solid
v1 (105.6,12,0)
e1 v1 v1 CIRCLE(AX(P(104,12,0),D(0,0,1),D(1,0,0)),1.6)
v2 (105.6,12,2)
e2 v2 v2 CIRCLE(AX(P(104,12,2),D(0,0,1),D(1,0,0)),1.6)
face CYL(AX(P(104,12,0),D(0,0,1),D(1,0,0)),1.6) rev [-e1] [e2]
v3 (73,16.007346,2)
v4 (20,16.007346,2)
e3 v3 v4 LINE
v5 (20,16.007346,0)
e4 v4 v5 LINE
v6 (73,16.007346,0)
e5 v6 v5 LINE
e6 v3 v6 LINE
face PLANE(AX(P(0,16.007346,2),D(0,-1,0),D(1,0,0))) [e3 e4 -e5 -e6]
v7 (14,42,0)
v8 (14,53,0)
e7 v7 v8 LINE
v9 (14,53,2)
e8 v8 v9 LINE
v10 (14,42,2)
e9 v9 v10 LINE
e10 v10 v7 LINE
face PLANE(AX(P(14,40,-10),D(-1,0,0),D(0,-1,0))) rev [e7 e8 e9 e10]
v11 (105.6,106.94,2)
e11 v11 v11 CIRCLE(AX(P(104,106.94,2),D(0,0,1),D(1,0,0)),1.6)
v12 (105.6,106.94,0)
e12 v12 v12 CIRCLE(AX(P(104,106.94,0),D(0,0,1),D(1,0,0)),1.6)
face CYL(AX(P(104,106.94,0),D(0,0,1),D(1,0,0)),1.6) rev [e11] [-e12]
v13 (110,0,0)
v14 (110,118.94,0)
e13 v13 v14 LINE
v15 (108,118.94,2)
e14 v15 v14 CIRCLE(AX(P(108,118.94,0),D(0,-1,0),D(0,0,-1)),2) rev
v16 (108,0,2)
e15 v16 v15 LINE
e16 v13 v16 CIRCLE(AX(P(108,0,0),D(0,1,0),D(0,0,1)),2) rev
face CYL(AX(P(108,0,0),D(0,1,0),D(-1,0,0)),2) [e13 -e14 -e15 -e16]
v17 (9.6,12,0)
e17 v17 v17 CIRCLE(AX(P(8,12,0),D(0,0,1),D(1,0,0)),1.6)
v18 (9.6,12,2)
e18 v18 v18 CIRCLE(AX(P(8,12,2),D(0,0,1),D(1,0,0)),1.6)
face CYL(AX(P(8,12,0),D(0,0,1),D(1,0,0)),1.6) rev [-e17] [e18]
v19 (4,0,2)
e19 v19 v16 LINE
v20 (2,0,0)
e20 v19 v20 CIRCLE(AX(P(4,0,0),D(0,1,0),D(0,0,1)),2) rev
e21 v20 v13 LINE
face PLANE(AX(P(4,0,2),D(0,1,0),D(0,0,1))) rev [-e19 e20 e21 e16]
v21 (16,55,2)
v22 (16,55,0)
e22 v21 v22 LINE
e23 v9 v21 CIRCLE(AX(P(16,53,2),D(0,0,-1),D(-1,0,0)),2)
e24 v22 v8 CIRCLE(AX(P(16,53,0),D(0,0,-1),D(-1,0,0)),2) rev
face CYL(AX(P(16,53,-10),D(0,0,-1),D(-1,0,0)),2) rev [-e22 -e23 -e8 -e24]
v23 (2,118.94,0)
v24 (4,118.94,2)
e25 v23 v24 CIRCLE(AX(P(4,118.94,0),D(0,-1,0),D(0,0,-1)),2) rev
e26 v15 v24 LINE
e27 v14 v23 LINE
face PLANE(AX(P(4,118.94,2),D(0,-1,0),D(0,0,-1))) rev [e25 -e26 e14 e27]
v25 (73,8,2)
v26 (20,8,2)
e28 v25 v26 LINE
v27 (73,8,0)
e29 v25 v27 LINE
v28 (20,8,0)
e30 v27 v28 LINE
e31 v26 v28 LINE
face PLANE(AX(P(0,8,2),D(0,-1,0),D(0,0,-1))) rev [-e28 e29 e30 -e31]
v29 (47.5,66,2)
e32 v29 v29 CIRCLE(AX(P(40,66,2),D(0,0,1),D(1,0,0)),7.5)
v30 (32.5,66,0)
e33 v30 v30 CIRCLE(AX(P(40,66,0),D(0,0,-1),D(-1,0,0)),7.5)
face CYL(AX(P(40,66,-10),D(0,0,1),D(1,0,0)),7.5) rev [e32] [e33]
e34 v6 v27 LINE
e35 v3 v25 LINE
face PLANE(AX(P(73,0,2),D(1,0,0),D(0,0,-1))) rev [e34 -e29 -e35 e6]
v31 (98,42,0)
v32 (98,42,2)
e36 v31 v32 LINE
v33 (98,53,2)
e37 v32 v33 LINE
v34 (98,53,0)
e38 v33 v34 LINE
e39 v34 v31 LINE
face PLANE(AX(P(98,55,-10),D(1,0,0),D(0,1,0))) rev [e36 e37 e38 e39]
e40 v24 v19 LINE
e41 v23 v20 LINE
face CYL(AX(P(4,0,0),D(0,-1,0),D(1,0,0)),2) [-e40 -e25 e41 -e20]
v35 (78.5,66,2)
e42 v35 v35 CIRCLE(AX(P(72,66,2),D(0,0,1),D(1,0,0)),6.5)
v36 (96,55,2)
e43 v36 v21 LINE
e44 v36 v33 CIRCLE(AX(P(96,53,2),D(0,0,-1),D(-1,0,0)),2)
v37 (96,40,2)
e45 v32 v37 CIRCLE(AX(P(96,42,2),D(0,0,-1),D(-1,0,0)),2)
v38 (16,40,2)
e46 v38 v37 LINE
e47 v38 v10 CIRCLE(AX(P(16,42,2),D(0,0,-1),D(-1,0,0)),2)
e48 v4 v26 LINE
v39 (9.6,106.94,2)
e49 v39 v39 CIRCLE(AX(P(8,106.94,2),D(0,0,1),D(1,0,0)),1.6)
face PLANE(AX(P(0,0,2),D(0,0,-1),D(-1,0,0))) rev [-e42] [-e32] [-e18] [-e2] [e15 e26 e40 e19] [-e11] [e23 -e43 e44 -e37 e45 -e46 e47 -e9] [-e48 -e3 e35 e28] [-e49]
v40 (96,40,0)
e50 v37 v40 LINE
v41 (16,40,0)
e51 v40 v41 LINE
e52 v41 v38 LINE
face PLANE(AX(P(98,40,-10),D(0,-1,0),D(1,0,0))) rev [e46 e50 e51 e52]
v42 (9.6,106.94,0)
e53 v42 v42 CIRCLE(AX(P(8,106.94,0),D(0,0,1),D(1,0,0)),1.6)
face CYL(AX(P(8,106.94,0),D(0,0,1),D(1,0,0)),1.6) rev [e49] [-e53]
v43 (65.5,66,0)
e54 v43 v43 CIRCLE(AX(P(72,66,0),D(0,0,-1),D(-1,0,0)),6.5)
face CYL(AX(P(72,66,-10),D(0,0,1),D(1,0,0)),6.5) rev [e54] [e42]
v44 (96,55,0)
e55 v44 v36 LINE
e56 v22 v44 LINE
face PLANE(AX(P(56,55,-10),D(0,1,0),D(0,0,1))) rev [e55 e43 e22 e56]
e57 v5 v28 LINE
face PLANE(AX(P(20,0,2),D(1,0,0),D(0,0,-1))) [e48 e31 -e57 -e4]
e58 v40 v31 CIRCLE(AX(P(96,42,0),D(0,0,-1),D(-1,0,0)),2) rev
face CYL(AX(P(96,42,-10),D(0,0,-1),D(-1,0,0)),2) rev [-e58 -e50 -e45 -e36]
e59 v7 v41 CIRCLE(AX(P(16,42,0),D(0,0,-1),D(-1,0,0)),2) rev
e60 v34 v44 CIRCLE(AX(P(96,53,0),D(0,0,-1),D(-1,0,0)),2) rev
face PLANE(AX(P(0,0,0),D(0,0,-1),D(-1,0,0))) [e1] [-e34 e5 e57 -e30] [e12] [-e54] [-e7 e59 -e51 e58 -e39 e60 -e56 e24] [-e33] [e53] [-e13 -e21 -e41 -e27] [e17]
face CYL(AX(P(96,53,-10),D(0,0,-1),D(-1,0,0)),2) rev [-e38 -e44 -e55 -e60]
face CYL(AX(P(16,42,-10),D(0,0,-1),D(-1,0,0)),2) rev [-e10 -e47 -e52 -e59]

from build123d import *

# Parameters (mm, degrees)
SZKIC1_W                    = 104
SZKIC1_H                    = 118.94
DODANIE_WYCI_GNI_CIE1_DEPTH = 2
SZKIC2_W                    = 53
SZKIC2_H                    = 1.6
SZKIC2_H_2                  = 6.407346329
WYTNIJ_WYCI_GNI_CIE2_DEPTH  = 2
SZKIC4_W                    = 2
SZKIC4_H                    = 118.94
DODANIE_WYCI_GNI_CIE2_DEPTH = 2
SZKIC5_R                    = 1.6
WYTNIJ_WYCI_GNI_CIE3_DEPTH  = 2
ZAOKR_GLENIE1_R             = 2
SZKIC6_R                    = 6.5
SZKIC6_R_2                  = 7.5
WYTNIJ_WYCI_GNI_CIE4_DEPTH  = 12
WYTNIJ_WYCI_GNI_CIE5_DEPTH  = 12
ZAOKR_GLENIE2_R             = 2


with BuildPart() as part:
    # Szkic1 → Dodanie-wyciągnięcie1 (new body)
    with BuildSketch(Plane.XY):
        with Locations((56, 59.47)):
            Rectangle(SZKIC1_W, SZKIC1_H)
    extrude(amount=DODANIE_WYCI_GNI_CIE1_DEPTH)

    # Szkic2 → Wytnij-wyciągnięcie2 (cut)
    with BuildSketch(Plane(origin=(0, 0, 0), x_dir=(-1, 0, 0), z_dir=(0, 0, -1))):
        with Locations((-46.5, 8.8)):
            Rectangle(SZKIC2_W, SZKIC2_H)
        with Locations((-46.5, 12.803673165)):
            Rectangle(SZKIC2_W, SZKIC2_H_2)
    extrude(amount=-WYTNIJ_WYCI_GNI_CIE2_DEPTH, mode=Mode.SUBTRACT)

    # Szkic4 → Dodanie-wyciągnięcie2 (add)
    with BuildSketch(Plane(origin=(0, 0, 0), x_dir=(-1, 0, 0), z_dir=(0, 0, -1))):
        with Locations((-3, 59.47)):
            Rectangle(SZKIC4_W, SZKIC4_H)
        with Locations((-109, 59.47)):
            Rectangle(SZKIC4_W, SZKIC4_H)
    extrude(amount=-DODANIE_WYCI_GNI_CIE2_DEPTH)

    # Szkic5 → Wytnij-wyciągnięcie3 (cut)
    with BuildSketch(Plane.XY.offset(2)):
        with Locations((8, 12)):
            Circle(SZKIC5_R)
        with Locations((104, 12)):
            Circle(SZKIC5_R)
        with Locations((8, 106.94)):
            Circle(SZKIC5_R)
        with Locations((104, 106.94)):
            Circle(SZKIC5_R)
    extrude(amount=-WYTNIJ_WYCI_GNI_CIE3_DEPTH, mode=Mode.SUBTRACT)

    # Zaokrąglenie1
    zaokr_glenie1_edges = [part.edges().sort_by_distance(p)[0] for p in [
        (110, 59.47, 2),
        (2, 59.47, 2),
    ]]
    fillet(zaokr_glenie1_edges, radius=ZAOKR_GLENIE1_R - 0.0001)  # a hair under: the kernel refuses the full size

    # Szkic6 → Wytnij-wyciągnięcie4 (cut)
    with BuildSketch(Plane.XY.offset(2)):
        with Locations((72, 66)):
            Circle(SZKIC6_R)
        with Locations((40, 66)):
            Circle(SZKIC6_R_2)
    extrude(amount=-WYTNIJ_WYCI_GNI_CIE4_DEPTH, mode=Mode.SUBTRACT)

    # Szkic7 → Wytnij-wyciągnięcie5 (cut)
    with BuildSketch(Plane.XY.offset(2)):
        Polygon((56, 55), (98, 55), (98, 40), (14, 40), (14, 55), align=None)
    extrude(amount=-WYTNIJ_WYCI_GNI_CIE5_DEPTH, mode=Mode.SUBTRACT)

    # Zaokrąglenie2
    zaokr_glenie2_edges = [part.edges().sort_by_distance(p)[0] for p in [
        (14, 55, 1),
        (98, 55, 1),
        (98, 40, 1),
        (14, 40, 1),
    ]]
    fillet(zaokr_glenie2_edges, radius=ZAOKR_GLENIE2_R)


solid = part.part
